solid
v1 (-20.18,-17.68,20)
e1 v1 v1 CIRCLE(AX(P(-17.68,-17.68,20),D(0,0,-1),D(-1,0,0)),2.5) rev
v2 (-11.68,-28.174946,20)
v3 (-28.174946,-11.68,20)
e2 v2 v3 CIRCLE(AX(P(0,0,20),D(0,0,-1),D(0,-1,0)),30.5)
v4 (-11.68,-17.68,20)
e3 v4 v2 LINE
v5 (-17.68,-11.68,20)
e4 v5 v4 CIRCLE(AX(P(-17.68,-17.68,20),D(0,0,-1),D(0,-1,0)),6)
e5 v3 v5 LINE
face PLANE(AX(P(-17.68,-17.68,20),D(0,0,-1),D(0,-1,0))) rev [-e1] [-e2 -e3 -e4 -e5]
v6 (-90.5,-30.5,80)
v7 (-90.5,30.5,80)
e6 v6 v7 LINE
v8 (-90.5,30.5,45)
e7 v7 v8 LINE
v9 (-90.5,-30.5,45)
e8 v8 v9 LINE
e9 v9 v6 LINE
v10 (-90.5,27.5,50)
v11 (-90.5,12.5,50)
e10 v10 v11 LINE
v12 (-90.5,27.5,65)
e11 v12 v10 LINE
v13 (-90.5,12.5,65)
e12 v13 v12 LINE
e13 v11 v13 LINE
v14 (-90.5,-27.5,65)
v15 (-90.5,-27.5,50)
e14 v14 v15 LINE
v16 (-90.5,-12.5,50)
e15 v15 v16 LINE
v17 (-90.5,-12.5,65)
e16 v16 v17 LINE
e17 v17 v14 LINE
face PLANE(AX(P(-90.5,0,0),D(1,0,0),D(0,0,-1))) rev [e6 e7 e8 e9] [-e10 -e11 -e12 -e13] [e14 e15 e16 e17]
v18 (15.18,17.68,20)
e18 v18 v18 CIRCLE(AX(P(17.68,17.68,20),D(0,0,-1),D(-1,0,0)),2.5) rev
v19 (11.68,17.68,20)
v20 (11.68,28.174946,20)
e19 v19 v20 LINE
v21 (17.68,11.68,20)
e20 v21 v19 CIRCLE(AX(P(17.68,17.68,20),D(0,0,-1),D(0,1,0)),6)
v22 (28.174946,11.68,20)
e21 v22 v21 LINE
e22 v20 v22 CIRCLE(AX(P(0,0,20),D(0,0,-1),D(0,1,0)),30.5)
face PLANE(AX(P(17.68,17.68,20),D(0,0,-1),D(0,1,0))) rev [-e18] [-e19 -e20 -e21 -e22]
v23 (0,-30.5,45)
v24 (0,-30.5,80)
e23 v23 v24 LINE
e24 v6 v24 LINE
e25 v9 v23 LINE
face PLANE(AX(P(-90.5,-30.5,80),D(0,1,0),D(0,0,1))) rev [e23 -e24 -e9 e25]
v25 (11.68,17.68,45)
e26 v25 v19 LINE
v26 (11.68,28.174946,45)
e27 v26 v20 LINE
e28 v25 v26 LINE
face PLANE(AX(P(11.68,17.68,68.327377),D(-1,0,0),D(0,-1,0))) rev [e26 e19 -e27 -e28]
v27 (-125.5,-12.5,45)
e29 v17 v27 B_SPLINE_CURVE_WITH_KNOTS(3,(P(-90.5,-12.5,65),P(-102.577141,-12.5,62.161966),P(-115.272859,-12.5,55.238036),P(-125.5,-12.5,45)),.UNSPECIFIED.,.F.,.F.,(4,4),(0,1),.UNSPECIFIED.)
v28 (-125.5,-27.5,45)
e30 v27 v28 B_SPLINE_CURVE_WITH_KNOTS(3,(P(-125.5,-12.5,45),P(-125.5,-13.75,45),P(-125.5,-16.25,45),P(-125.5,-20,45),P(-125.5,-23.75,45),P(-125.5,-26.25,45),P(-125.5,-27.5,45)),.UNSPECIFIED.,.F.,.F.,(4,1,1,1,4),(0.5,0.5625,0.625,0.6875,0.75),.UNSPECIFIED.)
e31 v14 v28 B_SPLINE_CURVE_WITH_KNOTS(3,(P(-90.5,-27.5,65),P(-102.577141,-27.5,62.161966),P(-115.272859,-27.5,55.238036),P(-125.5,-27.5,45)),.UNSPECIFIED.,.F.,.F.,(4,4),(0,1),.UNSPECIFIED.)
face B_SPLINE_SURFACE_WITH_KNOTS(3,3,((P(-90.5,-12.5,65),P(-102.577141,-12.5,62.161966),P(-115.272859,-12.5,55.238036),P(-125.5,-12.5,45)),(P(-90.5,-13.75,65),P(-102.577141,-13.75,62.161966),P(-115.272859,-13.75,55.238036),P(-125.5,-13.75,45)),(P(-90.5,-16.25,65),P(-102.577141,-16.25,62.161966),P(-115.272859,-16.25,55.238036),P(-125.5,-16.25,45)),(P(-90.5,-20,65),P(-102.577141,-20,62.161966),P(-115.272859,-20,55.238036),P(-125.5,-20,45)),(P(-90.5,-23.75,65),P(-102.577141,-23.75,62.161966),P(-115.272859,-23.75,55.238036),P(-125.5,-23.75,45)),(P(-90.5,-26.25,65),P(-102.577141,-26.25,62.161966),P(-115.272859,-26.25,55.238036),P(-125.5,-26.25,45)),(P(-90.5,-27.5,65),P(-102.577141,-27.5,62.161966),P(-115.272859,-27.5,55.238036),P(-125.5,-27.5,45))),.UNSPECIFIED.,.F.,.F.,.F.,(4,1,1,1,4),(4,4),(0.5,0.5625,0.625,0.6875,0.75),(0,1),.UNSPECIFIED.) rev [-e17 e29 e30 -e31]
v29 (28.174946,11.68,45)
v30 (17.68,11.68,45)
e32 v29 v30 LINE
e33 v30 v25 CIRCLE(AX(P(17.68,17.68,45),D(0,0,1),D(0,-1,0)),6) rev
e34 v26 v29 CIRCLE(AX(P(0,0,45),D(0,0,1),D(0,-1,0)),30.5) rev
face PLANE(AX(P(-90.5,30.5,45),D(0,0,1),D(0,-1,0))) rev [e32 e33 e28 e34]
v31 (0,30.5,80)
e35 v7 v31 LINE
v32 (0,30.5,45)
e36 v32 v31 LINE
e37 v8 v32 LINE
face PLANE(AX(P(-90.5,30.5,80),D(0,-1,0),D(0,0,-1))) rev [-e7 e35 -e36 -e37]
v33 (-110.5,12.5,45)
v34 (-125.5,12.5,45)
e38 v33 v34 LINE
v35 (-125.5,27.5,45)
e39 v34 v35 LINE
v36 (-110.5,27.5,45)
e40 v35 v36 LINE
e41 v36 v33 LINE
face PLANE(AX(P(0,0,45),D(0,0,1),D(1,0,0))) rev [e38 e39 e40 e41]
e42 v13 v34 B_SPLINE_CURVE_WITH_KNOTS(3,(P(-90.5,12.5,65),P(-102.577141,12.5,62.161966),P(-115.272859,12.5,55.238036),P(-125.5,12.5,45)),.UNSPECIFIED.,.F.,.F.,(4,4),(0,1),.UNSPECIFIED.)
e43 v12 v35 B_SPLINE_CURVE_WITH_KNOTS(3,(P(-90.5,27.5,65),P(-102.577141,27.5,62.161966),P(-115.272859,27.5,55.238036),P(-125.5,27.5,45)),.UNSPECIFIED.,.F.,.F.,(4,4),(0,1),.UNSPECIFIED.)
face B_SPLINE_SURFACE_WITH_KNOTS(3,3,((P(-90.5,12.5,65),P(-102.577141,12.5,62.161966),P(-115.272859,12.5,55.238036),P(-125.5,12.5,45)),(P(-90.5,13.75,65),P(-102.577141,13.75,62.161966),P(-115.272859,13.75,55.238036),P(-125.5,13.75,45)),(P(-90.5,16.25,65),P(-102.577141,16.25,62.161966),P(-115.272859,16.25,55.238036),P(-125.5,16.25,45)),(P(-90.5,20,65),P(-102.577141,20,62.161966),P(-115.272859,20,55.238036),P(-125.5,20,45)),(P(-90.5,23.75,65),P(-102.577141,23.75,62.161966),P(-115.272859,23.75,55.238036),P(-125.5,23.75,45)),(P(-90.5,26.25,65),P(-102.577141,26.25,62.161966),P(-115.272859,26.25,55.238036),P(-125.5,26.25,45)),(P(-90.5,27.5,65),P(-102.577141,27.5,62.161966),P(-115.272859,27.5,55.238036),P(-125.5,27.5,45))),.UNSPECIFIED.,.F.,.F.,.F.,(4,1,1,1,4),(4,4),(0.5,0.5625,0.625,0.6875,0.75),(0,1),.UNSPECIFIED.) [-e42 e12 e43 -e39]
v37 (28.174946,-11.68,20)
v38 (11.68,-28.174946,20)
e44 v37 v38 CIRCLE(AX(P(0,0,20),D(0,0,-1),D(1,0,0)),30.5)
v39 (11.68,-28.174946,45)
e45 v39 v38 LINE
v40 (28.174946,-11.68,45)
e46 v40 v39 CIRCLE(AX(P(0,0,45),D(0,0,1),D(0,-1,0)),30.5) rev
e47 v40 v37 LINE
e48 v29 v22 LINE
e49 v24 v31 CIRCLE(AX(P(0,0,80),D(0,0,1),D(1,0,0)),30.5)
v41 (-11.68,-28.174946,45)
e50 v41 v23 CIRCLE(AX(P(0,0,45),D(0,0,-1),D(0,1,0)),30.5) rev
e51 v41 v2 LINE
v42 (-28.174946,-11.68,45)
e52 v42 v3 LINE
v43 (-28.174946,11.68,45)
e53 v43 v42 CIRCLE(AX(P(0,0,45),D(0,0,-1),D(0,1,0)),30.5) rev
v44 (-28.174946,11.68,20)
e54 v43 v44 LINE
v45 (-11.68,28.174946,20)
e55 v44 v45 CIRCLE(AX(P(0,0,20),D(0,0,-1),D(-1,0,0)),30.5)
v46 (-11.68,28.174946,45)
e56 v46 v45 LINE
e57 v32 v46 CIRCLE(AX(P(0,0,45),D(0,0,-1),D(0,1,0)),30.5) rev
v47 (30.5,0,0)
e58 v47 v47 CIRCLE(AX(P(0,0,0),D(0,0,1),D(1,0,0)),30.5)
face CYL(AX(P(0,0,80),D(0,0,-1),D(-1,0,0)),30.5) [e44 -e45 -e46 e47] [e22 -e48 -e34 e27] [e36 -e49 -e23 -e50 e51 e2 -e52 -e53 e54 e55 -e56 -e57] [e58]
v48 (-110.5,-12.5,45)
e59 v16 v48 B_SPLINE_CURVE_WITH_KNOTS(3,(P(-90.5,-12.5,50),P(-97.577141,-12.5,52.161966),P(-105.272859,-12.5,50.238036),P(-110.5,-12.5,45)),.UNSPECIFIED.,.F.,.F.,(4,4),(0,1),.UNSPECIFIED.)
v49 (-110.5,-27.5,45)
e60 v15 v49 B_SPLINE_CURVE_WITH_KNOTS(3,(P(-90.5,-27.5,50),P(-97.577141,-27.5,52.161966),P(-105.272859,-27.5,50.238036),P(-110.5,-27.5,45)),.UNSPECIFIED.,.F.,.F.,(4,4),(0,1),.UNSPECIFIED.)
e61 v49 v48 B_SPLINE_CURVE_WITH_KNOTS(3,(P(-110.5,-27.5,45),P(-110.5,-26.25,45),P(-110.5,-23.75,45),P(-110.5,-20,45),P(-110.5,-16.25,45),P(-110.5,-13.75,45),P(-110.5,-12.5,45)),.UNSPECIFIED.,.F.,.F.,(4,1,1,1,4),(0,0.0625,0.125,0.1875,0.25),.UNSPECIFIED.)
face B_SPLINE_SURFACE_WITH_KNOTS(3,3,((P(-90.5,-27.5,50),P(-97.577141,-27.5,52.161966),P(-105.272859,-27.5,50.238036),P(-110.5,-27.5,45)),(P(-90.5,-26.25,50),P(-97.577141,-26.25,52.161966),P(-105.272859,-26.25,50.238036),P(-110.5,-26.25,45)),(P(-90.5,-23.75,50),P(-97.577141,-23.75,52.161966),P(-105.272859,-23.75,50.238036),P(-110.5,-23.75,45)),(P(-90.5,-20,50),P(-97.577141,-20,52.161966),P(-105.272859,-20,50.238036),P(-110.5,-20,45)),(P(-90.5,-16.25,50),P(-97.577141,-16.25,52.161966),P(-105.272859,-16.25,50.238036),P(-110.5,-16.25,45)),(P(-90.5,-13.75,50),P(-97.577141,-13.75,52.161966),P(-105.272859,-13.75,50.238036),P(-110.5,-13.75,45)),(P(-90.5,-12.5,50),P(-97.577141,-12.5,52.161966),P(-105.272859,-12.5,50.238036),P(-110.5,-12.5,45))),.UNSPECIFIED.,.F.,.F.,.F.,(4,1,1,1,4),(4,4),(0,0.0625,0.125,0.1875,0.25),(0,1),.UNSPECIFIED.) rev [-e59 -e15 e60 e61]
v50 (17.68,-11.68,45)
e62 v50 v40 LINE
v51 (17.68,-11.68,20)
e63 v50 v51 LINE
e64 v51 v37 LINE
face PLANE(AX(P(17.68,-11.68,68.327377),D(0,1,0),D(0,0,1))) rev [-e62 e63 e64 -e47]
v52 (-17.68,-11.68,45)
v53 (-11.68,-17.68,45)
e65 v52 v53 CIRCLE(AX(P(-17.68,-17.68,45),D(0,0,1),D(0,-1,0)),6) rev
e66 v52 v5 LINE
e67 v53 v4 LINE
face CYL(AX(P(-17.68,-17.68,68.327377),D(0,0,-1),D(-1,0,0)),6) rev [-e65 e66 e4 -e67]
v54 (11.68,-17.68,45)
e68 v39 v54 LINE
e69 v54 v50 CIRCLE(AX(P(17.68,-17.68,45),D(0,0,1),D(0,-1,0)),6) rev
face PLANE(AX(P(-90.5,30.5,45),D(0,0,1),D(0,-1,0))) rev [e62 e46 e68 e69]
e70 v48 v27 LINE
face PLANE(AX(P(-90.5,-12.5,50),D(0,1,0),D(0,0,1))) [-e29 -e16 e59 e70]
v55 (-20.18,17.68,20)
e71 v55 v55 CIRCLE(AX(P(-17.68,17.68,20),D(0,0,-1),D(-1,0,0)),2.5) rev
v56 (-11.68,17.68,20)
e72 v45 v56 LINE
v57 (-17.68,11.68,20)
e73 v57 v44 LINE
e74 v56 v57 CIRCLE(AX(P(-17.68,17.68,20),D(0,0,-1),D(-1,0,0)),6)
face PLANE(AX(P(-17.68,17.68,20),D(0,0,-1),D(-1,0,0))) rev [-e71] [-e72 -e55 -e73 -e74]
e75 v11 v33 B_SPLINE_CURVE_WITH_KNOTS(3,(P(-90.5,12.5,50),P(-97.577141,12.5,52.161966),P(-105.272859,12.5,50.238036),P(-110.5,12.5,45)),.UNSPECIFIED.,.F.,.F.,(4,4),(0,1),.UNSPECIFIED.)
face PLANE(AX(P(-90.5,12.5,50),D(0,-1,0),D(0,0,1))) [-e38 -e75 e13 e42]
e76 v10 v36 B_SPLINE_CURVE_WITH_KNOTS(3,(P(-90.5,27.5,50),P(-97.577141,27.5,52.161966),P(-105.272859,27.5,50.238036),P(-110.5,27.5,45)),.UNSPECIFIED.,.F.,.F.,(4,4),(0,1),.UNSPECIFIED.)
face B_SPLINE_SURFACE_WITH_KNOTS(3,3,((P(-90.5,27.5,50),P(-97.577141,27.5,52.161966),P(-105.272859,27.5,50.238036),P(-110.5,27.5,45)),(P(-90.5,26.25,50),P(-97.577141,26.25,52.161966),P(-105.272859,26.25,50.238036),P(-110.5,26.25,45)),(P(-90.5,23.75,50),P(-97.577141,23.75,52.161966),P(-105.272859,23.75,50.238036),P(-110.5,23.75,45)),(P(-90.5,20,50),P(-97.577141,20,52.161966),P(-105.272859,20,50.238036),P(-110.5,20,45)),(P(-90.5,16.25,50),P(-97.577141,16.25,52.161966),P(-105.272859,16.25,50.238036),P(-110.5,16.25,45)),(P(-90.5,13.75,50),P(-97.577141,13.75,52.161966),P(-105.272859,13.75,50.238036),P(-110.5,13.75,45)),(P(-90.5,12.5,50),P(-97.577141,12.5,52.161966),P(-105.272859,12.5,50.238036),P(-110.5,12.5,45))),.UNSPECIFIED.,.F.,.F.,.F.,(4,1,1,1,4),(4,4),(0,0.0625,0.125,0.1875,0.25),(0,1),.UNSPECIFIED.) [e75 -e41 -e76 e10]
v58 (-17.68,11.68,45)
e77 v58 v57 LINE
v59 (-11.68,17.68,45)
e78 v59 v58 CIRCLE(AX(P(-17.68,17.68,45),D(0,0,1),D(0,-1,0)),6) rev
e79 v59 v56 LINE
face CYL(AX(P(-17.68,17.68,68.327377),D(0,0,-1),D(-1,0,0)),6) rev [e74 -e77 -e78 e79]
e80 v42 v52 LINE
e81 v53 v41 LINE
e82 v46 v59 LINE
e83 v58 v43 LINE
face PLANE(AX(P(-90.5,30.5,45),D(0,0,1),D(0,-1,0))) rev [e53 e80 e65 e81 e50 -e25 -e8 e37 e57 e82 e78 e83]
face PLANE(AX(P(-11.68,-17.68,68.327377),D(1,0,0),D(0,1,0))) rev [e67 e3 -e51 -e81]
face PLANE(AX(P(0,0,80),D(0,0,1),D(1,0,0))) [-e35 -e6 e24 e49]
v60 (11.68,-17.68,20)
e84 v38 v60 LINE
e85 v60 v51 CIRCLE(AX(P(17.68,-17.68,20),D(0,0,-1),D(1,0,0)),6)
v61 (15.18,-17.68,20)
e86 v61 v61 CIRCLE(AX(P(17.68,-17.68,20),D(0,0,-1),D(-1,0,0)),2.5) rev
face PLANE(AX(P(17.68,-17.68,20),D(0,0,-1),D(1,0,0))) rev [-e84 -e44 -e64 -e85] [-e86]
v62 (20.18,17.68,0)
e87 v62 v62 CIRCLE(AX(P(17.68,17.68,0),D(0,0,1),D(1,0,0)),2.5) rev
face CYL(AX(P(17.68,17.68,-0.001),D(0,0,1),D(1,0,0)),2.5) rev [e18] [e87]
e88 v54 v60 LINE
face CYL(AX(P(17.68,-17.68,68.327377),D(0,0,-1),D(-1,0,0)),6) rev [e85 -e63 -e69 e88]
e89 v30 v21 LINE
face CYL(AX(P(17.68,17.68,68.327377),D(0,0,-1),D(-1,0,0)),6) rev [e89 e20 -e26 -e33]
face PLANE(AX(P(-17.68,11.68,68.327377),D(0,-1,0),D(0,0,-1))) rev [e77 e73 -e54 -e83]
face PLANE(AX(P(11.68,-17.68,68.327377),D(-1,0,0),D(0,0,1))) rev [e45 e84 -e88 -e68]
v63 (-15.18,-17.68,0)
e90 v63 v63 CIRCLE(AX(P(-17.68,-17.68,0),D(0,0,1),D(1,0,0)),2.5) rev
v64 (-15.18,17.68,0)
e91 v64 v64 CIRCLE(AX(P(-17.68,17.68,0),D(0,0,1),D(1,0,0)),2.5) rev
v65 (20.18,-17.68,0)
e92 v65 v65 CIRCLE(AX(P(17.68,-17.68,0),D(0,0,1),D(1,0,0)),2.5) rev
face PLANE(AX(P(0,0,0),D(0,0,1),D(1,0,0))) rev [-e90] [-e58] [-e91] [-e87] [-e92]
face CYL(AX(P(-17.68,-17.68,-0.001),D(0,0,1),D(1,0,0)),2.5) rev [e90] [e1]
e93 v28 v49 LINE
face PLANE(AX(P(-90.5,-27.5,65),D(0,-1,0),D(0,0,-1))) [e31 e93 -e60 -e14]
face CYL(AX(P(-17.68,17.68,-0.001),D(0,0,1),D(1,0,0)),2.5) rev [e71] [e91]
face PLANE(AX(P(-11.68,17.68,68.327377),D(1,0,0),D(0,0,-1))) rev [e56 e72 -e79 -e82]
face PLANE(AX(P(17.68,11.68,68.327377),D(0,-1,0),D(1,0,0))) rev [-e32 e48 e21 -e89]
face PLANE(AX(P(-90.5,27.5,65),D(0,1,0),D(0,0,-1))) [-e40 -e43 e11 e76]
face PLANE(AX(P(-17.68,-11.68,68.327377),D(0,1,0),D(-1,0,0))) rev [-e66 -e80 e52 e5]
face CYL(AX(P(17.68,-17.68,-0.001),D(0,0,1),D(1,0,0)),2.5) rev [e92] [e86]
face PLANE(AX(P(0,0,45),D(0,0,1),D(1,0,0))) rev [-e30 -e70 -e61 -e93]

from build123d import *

# Parameters (mm, degrees)
SKETCH1_R                            = 30.5
BOSS_EXTRUDE1_DEPTH                  = 80
CUT_EXTRUDE1_REACH                   = 142.887
CUT_EXTRUDE1_START                   = -50
SKETCH2_R                            = 2.5
SKETCH7_W                            = 35
SKETCH7_H                            = 61
BOSS_EXTRUDE4_DEPTH                  = 60
BOSS_EXTRUDE4_DIRECTION_2_REACH      = 107.125
BOSS_EXTRUDE4_DIRECTION_2_END_RADIUS = 30.5
LOFT3_START                          = 12.5
LOFT3_DEPTH                          = 15
CUT_EXTRUDE2_START                   = -20
CUT_EXTRUDE2_DEPTH                   = 25
CIRPATTERN1_COUNT                    = 4


# Read off the part's stored shape, not the designer's step: Loft3
with BuildPart() as part:
    # Sketch1 → Boss-Extrude1 (new body)
    with BuildSketch(Plane.XY):
        Circle(SKETCH1_R)
    extrude(amount=BOSS_EXTRUDE1_DEPTH)

    # Sketch2 → Cut-Extrude1 (cut, up to next)
    with BuildSketch(Plane.XY.offset(80).offset(CUT_EXTRUDE1_START), mode=Mode.PRIVATE) as cut_extrude1_sk1:
        with Locations((17.68, -17.68)):
            Circle(SKETCH2_R)
    cut_extrude1_tool1 = extrude(cut_extrude1_sk1.sketch, amount=-CUT_EXTRUDE1_REACH, mode=Mode.PRIVATE) & part.part
    # Sketch2 → Cut-Extrude1 (cut, up to next)
    with BuildSketch(Plane.XY.offset(80).offset(CUT_EXTRUDE1_START), mode=Mode.PRIVATE) as cut_extrude1_sk2:
        with Locations((17.68, 17.68)):
            Circle(SKETCH2_R)
    cut_extrude1_tool2 = extrude(cut_extrude1_sk2.sketch, amount=-CUT_EXTRUDE1_REACH, mode=Mode.PRIVATE) & part.part
    # Sketch2 → Cut-Extrude1 (cut, up to next)
    with BuildSketch(Plane.XY.offset(80).offset(CUT_EXTRUDE1_START), mode=Mode.PRIVATE) as cut_extrude1_sk3:
        with Locations((-17.68, 17.68)):
            Circle(SKETCH2_R)
    cut_extrude1_tool3 = extrude(cut_extrude1_sk3.sketch, amount=-CUT_EXTRUDE1_REACH, mode=Mode.PRIVATE) & part.part
    # Sketch2 → Cut-Extrude1 (cut, up to next)
    with BuildSketch(Plane.XY.offset(80).offset(CUT_EXTRUDE1_START), mode=Mode.PRIVATE) as cut_extrude1_sk4:
        with Locations((-17.68, -17.68)):
            Circle(SKETCH2_R)
    cut_extrude1_tool4 = extrude(cut_extrude1_sk4.sketch, amount=-CUT_EXTRUDE1_REACH, mode=Mode.PRIVATE) & part.part
    add(cut_extrude1_tool1.solids().sort_by_distance((17.68, -17.68, 30))[0], mode=Mode.SUBTRACT)
    add(cut_extrude1_tool2.solids().sort_by_distance((17.68, 17.68, 30))[0], mode=Mode.SUBTRACT)
    add(cut_extrude1_tool3.solids().sort_by_distance((-17.68, 17.68, 30))[0], mode=Mode.SUBTRACT)
    add(cut_extrude1_tool4.solids().sort_by_distance((-17.68, -17.68, 30))[0], mode=Mode.SUBTRACT)

    # Sketch7 → Boss-Extrude4 (add)
    with BuildSketch(Plane.ZY.offset(30.5)):
        with Locations((62.5, 0)):
            Rectangle(SKETCH7_W, SKETCH7_H)
    extrude(amount=BOSS_EXTRUDE4_DEPTH)

    # Boss-Extrude4 direction 2: up to this cylinder (the profile starts outside it)
    boss_extrude4_direction_2_end = Plane(origin=(0, 0, 62.5), z_dir=(0, 0, -1)) * Cylinder(BOSS_EXTRUDE4_DIRECTION_2_END_RADIUS, 276.25, mode=Mode.PRIVATE)
    # Sketch7 → Boss-Extrude4 direction 2 (add, up to the surface)
    with BuildSketch(Plane.ZY.offset(30.5), mode=Mode.PRIVATE) as boss_extrude4_direction_2_sk1:
        with Locations((62.5, 0)):
            Rectangle(SKETCH7_W, SKETCH7_H)
    boss_extrude4_direction_2_tool1 = extrude(boss_extrude4_direction_2_sk1.sketch, amount=-BOSS_EXTRUDE4_DIRECTION_2_REACH, mode=Mode.PRIVATE) - boss_extrude4_direction_2_end
    add(boss_extrude4_direction_2_tool1.solids().sort_by_distance((-30.5, 0, 62.5))[0])
    add(boss_extrude4_direction_2_tool1.solids().sort_by_distance((-30.5, 0, 62.5))[1])

    # Loft3 outline → Loft3 (add)
    with BuildSketch(Plane(origin=(0, 0, 0), x_dir=(1, 0, 0), z_dir=(0, 1, 0)).offset(LOFT3_START)):
        with BuildLine():
            add(Edge.make_bspline(
                [(-90.5, -65), (-102.577141217, -62.16196551), (-115.272859166, -55.238036023), (-125.5, -45)],
                knots=[0, 0, 0, 0, 1, 1, 1, 1], degree=3))
            Line((-90.5, -65), (-90.5, -50))
            add(Edge.make_bspline(
                [(-90.5, -50), (-97.577141217, -52.16196551), (-105.272859166, -50.238036023), (-110.5, -45)],
                knots=[0, 0, 0, 0, 1, 1, 1, 1], degree=3))
            Line((-110.5, -45), (-125.5, -45))
        make_face()
    loft3 = extrude(amount=LOFT3_DEPTH)

    # Mirror1: Loft3 across plane
    add(loft3.mirror(Plane.ZX))

    # Sketch10 → Cut-Extrude2 (cut)
    with BuildSketch(Plane(origin=(0, 0, 0), x_dir=(-1, 0, 0), z_dir=(0, 0, -1)).offset(CUT_EXTRUDE2_START)):
        with BuildLine():
            Line((11.68, 17.68), (11.68, 28.174946318))
            ThreePointArc((11.68, 28.174946318), (21.566756826, 21.566756826), (28.174946318, 11.68))
            Line((28.174946318, 11.68), (17.68, 11.68))
            ThreePointArc((17.68, 11.68), (13.437359313, 13.437359313), (11.68, 17.68))
        make_face()
    cut_extrude2 = extrude(amount=-CUT_EXTRUDE2_DEPTH, mode=Mode.SUBTRACT)

    # CirPattern1: Cut-Extrude2 ×4 about axis
    cirpattern1_axis = Axis((0, 0, 0), (0, 0, 1))
    for i in range(1, CIRPATTERN1_COUNT):
        add(cut_extrude2.rotate(cirpattern1_axis, i * 360 / CIRPATTERN1_COUNT), mode=Mode.SUBTRACT)


solid = part.part
